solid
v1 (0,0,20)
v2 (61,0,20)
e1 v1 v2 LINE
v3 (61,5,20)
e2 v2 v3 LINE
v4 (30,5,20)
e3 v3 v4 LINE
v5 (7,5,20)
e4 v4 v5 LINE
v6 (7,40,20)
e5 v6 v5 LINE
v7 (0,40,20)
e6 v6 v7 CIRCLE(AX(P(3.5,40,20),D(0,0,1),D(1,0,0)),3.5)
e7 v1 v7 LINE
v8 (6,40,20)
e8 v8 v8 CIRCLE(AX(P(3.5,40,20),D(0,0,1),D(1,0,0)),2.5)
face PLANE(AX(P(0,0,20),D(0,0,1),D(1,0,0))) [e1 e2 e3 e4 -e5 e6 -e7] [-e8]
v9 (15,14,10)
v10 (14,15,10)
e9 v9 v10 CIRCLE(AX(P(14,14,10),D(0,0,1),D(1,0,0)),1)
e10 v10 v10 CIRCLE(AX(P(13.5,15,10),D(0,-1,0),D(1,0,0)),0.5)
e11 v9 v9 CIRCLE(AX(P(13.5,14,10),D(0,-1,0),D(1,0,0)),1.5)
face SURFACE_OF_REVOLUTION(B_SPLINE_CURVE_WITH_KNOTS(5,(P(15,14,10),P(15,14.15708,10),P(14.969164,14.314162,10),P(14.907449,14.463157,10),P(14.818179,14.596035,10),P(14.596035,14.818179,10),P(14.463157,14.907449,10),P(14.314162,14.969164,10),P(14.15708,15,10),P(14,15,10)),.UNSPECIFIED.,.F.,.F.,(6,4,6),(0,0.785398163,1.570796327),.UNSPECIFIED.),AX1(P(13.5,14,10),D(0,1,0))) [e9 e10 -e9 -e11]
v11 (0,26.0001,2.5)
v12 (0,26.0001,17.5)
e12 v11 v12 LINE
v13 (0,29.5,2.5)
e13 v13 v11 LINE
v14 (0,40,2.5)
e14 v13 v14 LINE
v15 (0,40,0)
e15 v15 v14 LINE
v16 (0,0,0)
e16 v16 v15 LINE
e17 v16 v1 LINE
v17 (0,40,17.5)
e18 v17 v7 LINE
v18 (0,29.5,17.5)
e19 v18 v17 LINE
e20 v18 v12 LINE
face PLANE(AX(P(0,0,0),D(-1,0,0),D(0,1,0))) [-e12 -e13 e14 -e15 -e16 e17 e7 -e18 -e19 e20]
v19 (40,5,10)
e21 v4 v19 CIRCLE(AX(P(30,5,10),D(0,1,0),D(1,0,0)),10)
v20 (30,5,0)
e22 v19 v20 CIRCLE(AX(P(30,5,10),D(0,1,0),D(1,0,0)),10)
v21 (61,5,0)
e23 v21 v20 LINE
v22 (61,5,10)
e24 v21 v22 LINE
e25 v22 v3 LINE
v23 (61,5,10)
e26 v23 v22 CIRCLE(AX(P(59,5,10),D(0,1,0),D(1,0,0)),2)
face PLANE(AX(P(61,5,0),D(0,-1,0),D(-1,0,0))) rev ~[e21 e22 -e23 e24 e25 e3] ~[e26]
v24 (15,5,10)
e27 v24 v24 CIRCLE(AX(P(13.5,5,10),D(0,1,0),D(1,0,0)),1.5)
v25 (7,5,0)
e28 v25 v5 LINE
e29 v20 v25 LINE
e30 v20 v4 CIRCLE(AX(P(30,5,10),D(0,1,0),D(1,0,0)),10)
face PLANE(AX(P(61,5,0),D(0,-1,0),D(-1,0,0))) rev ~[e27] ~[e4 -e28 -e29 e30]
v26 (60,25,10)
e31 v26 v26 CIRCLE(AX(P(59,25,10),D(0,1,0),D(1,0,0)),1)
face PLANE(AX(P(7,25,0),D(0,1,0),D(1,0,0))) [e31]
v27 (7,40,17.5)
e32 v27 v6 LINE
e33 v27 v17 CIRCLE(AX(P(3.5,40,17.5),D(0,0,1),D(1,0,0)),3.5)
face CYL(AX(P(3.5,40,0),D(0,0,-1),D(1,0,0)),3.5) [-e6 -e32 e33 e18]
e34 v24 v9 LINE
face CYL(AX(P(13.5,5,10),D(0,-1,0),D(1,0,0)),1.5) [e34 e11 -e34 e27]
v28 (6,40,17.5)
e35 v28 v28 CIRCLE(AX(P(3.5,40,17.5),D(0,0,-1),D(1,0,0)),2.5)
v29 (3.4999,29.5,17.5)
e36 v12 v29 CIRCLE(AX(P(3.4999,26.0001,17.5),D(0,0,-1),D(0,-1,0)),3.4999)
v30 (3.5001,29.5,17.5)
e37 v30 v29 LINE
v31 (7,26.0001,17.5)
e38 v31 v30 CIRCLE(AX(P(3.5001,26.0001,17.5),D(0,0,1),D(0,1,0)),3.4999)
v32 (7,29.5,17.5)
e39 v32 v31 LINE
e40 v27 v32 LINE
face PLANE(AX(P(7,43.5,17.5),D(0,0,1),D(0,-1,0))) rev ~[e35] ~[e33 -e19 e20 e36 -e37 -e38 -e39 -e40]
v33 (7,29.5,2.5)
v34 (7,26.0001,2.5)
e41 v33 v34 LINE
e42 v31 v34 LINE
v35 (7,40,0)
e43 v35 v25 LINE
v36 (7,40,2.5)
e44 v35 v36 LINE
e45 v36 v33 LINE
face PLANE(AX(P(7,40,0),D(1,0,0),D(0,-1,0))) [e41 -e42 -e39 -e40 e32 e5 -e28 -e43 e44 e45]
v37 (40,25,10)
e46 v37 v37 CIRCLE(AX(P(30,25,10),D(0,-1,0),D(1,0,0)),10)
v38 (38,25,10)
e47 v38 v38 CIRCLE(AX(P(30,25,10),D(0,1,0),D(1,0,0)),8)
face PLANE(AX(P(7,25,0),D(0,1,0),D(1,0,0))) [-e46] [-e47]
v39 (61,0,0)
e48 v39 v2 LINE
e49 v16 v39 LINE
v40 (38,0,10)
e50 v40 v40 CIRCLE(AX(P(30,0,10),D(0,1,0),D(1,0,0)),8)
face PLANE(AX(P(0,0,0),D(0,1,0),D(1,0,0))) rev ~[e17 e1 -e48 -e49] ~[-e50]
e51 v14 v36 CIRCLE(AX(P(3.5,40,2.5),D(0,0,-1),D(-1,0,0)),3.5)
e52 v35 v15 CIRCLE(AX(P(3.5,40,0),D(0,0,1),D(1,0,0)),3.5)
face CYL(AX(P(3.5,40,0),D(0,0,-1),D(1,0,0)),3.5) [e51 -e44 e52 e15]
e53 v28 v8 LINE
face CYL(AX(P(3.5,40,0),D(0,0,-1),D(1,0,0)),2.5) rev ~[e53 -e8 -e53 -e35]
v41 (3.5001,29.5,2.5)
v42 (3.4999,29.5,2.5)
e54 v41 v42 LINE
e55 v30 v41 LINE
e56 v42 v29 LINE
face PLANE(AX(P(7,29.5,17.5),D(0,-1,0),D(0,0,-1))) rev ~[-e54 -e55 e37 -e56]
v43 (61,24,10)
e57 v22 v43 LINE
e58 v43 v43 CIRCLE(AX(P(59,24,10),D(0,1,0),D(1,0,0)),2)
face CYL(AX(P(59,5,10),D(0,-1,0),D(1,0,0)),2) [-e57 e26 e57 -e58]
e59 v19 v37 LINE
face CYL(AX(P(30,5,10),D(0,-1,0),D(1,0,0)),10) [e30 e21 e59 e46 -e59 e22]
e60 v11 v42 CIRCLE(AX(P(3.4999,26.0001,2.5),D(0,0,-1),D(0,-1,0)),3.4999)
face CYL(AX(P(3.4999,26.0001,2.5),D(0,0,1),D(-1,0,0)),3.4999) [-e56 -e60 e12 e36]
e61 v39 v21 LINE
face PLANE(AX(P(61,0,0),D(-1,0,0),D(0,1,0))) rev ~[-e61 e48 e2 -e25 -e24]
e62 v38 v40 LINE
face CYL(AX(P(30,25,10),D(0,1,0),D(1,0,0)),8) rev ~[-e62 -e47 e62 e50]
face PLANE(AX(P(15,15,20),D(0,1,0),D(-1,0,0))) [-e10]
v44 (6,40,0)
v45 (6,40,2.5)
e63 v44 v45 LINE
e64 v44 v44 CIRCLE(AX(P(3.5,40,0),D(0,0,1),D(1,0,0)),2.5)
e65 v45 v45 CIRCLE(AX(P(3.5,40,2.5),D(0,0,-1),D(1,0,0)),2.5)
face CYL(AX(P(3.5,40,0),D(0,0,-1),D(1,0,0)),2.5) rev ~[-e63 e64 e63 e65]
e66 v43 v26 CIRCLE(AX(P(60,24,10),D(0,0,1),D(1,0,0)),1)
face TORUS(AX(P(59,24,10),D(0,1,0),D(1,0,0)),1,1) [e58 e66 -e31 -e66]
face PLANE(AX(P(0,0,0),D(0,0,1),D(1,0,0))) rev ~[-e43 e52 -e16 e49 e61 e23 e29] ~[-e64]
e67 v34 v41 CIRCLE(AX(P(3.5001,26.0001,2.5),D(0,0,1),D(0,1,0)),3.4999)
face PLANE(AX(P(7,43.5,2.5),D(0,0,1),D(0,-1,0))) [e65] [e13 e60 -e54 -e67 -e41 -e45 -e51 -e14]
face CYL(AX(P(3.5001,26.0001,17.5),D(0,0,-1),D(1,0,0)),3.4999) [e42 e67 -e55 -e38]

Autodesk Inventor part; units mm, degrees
ref_plane "YZ Plane" through (0, 0, 0) normal (1, 0, 0) x (0, 1, 0)
ref_plane "XZ Plane" through (0, 0, 0) normal (0, 1, 0) x (-1, 0, 0)
ref_plane "XY Plane" through (0, 0, 0) normal (0, 0, 1) x (1, 0, 0)
sketch "Sketch1" plane through (0, 0, 0) normal (0, 0, 1) x (1, 0, 0)
  line L0 (0, 0) -> (0, 40)
  line L1 (0, 0) -> (61, 0)
  line L2 (61, 0) -> (61, 5)
  line L3 (61, 5) -> (7, 5)
  arc A0 (7, 40) -> (0, 40) centre (3.5, 40) ccw
  line L4 (7, 40) -> (7, 5)
  circle A1 centre (3.5, 40) radius 2.5
  dimension "d0" = 40
  dimension "d2" = 5
  dimension "d6" = 3.5
  dimension "d7" = 5
  dimension "d8" = 7
  dimension "d9" = 54
  dimension "d46" = 61
extrude "Extrusion1" add sketch "Sketch1" along normal blind 20
sketch "Sketch2" plane through (7, 5, 0) normal (0, 1, 0) x (1, 0, 0)
  circle A0 centre (6.5, -10) radius 1.5
  line L0 (0, 0) -> (0, -20) projected
  circle A1 centre (23, -10) radius 10
  line L1 (0, 0) -> (54, 0) projected
  circle A2 centre (52, -10) radius 2
  line L2 (54, 0) -> (54, -20) projected
  line L3 (-1, 0) -> (-1, -20) projected
  line L4 (-6, 0) -> (-6, -20) projected
  line L5 (-7, -10) -> (-7, -6.6929)
  point P0 (-7, 0)
  dimension "d12" = 3
  dimension "d13" = 6.5
  dimension "d14" = 20
  dimension "d16" = 23
  dimension "d19" = 10
  dimension "d20" = 4
  dimension "d21" = 10
  dimension "d22" = 17
  dimension "d47" = 31
  dimension "d48" = 59
  dimension "d49" = 30
  dimension "d50" = 13.5
extrude "Extrusion2" add sketch "Sketch2" along normal blind 20
sketch "Sketch4" plane through (0, 0, 20) normal (0, 0, 1) x (1, 0, 0)
  line L0 (15, 25) -> (12, 25) projected
  line L1 (12, 25) -> (15, 25)
  line L2 (15, 5) -> (15, 25) projected
  line L3 (15, 25) -> (15, 15)
  line L4 (15, 15) -> (12, 15)
  line L5 (12, 5) -> (12, 25) projected
  point P0 (0, 0)
  dimension "d25" = 10
extrude "Extrusion3" cut sketch "Sketch4" against normal blind 20
fillet "Fillet1" radius 1 1 edges at (12, 15, 10)
fillet "Fillet2" radius 1 1 edges at (57, 25, 10)
sketch "Sketch5" plane through (30, 25, 10) normal (0, 1, 0) x (1, 0, 0)
  circle A0 centre (0, 0) radius 8
  point P0 (-30, 10)
  dimension "d30" = 16
extrude "Extrusion4" cut sketch "Sketch5" against normal blind 30
sketch "Sketch6" plane through (7, 5, 0) normal (1, 0, 0) x (0, 0, -1)
  point P0 (0, -5)
sketch "Sketch7" plane through (7, 5, 0) normal (1, 0, 0) x (0, 0, -1)
  line L0 (-10, 41.0364) -> (-10, 39.6436)
  line L1 (0, 38.5) -> (-20, 38.5) projected
  line L2 (-2.5, 38.5) -> (-2.5, 24.5)
  line L3 (-17.5, 38.5) -> (-17.5, 24.5)
  line L4 (-17.5, 38.5) -> (-2.5, 38.5)
  line L5 (0, 32.5) -> (-20, 32.5) projected
  line L6 (-17.5, 24.5) -> (-2.5, 24.5)
  point P0 (0, -5)
  dimension "d12" = 3
  dimension "d40" = 14
  dimension "d41" = 14
  dimension "d42" = 15
extrude "Extrusion5" cut sketch "Sketch7" against normal blind 14
sketch "Sketch8" plane through (30, 5, 0) normal (0, 1, 0) x (1, 0, 0)
  point P0 (-30, 0)
fillet "Fillet4" radius 3.5 2 edges at (7, 29.5, 10) (0, 29.5, 10)
equation "\"d19\" = 0.5 * d14"
equation "\"d21\" = d19"
equation "\"d40\" = d41"
properties part number "ValveBaseMk2.1"
